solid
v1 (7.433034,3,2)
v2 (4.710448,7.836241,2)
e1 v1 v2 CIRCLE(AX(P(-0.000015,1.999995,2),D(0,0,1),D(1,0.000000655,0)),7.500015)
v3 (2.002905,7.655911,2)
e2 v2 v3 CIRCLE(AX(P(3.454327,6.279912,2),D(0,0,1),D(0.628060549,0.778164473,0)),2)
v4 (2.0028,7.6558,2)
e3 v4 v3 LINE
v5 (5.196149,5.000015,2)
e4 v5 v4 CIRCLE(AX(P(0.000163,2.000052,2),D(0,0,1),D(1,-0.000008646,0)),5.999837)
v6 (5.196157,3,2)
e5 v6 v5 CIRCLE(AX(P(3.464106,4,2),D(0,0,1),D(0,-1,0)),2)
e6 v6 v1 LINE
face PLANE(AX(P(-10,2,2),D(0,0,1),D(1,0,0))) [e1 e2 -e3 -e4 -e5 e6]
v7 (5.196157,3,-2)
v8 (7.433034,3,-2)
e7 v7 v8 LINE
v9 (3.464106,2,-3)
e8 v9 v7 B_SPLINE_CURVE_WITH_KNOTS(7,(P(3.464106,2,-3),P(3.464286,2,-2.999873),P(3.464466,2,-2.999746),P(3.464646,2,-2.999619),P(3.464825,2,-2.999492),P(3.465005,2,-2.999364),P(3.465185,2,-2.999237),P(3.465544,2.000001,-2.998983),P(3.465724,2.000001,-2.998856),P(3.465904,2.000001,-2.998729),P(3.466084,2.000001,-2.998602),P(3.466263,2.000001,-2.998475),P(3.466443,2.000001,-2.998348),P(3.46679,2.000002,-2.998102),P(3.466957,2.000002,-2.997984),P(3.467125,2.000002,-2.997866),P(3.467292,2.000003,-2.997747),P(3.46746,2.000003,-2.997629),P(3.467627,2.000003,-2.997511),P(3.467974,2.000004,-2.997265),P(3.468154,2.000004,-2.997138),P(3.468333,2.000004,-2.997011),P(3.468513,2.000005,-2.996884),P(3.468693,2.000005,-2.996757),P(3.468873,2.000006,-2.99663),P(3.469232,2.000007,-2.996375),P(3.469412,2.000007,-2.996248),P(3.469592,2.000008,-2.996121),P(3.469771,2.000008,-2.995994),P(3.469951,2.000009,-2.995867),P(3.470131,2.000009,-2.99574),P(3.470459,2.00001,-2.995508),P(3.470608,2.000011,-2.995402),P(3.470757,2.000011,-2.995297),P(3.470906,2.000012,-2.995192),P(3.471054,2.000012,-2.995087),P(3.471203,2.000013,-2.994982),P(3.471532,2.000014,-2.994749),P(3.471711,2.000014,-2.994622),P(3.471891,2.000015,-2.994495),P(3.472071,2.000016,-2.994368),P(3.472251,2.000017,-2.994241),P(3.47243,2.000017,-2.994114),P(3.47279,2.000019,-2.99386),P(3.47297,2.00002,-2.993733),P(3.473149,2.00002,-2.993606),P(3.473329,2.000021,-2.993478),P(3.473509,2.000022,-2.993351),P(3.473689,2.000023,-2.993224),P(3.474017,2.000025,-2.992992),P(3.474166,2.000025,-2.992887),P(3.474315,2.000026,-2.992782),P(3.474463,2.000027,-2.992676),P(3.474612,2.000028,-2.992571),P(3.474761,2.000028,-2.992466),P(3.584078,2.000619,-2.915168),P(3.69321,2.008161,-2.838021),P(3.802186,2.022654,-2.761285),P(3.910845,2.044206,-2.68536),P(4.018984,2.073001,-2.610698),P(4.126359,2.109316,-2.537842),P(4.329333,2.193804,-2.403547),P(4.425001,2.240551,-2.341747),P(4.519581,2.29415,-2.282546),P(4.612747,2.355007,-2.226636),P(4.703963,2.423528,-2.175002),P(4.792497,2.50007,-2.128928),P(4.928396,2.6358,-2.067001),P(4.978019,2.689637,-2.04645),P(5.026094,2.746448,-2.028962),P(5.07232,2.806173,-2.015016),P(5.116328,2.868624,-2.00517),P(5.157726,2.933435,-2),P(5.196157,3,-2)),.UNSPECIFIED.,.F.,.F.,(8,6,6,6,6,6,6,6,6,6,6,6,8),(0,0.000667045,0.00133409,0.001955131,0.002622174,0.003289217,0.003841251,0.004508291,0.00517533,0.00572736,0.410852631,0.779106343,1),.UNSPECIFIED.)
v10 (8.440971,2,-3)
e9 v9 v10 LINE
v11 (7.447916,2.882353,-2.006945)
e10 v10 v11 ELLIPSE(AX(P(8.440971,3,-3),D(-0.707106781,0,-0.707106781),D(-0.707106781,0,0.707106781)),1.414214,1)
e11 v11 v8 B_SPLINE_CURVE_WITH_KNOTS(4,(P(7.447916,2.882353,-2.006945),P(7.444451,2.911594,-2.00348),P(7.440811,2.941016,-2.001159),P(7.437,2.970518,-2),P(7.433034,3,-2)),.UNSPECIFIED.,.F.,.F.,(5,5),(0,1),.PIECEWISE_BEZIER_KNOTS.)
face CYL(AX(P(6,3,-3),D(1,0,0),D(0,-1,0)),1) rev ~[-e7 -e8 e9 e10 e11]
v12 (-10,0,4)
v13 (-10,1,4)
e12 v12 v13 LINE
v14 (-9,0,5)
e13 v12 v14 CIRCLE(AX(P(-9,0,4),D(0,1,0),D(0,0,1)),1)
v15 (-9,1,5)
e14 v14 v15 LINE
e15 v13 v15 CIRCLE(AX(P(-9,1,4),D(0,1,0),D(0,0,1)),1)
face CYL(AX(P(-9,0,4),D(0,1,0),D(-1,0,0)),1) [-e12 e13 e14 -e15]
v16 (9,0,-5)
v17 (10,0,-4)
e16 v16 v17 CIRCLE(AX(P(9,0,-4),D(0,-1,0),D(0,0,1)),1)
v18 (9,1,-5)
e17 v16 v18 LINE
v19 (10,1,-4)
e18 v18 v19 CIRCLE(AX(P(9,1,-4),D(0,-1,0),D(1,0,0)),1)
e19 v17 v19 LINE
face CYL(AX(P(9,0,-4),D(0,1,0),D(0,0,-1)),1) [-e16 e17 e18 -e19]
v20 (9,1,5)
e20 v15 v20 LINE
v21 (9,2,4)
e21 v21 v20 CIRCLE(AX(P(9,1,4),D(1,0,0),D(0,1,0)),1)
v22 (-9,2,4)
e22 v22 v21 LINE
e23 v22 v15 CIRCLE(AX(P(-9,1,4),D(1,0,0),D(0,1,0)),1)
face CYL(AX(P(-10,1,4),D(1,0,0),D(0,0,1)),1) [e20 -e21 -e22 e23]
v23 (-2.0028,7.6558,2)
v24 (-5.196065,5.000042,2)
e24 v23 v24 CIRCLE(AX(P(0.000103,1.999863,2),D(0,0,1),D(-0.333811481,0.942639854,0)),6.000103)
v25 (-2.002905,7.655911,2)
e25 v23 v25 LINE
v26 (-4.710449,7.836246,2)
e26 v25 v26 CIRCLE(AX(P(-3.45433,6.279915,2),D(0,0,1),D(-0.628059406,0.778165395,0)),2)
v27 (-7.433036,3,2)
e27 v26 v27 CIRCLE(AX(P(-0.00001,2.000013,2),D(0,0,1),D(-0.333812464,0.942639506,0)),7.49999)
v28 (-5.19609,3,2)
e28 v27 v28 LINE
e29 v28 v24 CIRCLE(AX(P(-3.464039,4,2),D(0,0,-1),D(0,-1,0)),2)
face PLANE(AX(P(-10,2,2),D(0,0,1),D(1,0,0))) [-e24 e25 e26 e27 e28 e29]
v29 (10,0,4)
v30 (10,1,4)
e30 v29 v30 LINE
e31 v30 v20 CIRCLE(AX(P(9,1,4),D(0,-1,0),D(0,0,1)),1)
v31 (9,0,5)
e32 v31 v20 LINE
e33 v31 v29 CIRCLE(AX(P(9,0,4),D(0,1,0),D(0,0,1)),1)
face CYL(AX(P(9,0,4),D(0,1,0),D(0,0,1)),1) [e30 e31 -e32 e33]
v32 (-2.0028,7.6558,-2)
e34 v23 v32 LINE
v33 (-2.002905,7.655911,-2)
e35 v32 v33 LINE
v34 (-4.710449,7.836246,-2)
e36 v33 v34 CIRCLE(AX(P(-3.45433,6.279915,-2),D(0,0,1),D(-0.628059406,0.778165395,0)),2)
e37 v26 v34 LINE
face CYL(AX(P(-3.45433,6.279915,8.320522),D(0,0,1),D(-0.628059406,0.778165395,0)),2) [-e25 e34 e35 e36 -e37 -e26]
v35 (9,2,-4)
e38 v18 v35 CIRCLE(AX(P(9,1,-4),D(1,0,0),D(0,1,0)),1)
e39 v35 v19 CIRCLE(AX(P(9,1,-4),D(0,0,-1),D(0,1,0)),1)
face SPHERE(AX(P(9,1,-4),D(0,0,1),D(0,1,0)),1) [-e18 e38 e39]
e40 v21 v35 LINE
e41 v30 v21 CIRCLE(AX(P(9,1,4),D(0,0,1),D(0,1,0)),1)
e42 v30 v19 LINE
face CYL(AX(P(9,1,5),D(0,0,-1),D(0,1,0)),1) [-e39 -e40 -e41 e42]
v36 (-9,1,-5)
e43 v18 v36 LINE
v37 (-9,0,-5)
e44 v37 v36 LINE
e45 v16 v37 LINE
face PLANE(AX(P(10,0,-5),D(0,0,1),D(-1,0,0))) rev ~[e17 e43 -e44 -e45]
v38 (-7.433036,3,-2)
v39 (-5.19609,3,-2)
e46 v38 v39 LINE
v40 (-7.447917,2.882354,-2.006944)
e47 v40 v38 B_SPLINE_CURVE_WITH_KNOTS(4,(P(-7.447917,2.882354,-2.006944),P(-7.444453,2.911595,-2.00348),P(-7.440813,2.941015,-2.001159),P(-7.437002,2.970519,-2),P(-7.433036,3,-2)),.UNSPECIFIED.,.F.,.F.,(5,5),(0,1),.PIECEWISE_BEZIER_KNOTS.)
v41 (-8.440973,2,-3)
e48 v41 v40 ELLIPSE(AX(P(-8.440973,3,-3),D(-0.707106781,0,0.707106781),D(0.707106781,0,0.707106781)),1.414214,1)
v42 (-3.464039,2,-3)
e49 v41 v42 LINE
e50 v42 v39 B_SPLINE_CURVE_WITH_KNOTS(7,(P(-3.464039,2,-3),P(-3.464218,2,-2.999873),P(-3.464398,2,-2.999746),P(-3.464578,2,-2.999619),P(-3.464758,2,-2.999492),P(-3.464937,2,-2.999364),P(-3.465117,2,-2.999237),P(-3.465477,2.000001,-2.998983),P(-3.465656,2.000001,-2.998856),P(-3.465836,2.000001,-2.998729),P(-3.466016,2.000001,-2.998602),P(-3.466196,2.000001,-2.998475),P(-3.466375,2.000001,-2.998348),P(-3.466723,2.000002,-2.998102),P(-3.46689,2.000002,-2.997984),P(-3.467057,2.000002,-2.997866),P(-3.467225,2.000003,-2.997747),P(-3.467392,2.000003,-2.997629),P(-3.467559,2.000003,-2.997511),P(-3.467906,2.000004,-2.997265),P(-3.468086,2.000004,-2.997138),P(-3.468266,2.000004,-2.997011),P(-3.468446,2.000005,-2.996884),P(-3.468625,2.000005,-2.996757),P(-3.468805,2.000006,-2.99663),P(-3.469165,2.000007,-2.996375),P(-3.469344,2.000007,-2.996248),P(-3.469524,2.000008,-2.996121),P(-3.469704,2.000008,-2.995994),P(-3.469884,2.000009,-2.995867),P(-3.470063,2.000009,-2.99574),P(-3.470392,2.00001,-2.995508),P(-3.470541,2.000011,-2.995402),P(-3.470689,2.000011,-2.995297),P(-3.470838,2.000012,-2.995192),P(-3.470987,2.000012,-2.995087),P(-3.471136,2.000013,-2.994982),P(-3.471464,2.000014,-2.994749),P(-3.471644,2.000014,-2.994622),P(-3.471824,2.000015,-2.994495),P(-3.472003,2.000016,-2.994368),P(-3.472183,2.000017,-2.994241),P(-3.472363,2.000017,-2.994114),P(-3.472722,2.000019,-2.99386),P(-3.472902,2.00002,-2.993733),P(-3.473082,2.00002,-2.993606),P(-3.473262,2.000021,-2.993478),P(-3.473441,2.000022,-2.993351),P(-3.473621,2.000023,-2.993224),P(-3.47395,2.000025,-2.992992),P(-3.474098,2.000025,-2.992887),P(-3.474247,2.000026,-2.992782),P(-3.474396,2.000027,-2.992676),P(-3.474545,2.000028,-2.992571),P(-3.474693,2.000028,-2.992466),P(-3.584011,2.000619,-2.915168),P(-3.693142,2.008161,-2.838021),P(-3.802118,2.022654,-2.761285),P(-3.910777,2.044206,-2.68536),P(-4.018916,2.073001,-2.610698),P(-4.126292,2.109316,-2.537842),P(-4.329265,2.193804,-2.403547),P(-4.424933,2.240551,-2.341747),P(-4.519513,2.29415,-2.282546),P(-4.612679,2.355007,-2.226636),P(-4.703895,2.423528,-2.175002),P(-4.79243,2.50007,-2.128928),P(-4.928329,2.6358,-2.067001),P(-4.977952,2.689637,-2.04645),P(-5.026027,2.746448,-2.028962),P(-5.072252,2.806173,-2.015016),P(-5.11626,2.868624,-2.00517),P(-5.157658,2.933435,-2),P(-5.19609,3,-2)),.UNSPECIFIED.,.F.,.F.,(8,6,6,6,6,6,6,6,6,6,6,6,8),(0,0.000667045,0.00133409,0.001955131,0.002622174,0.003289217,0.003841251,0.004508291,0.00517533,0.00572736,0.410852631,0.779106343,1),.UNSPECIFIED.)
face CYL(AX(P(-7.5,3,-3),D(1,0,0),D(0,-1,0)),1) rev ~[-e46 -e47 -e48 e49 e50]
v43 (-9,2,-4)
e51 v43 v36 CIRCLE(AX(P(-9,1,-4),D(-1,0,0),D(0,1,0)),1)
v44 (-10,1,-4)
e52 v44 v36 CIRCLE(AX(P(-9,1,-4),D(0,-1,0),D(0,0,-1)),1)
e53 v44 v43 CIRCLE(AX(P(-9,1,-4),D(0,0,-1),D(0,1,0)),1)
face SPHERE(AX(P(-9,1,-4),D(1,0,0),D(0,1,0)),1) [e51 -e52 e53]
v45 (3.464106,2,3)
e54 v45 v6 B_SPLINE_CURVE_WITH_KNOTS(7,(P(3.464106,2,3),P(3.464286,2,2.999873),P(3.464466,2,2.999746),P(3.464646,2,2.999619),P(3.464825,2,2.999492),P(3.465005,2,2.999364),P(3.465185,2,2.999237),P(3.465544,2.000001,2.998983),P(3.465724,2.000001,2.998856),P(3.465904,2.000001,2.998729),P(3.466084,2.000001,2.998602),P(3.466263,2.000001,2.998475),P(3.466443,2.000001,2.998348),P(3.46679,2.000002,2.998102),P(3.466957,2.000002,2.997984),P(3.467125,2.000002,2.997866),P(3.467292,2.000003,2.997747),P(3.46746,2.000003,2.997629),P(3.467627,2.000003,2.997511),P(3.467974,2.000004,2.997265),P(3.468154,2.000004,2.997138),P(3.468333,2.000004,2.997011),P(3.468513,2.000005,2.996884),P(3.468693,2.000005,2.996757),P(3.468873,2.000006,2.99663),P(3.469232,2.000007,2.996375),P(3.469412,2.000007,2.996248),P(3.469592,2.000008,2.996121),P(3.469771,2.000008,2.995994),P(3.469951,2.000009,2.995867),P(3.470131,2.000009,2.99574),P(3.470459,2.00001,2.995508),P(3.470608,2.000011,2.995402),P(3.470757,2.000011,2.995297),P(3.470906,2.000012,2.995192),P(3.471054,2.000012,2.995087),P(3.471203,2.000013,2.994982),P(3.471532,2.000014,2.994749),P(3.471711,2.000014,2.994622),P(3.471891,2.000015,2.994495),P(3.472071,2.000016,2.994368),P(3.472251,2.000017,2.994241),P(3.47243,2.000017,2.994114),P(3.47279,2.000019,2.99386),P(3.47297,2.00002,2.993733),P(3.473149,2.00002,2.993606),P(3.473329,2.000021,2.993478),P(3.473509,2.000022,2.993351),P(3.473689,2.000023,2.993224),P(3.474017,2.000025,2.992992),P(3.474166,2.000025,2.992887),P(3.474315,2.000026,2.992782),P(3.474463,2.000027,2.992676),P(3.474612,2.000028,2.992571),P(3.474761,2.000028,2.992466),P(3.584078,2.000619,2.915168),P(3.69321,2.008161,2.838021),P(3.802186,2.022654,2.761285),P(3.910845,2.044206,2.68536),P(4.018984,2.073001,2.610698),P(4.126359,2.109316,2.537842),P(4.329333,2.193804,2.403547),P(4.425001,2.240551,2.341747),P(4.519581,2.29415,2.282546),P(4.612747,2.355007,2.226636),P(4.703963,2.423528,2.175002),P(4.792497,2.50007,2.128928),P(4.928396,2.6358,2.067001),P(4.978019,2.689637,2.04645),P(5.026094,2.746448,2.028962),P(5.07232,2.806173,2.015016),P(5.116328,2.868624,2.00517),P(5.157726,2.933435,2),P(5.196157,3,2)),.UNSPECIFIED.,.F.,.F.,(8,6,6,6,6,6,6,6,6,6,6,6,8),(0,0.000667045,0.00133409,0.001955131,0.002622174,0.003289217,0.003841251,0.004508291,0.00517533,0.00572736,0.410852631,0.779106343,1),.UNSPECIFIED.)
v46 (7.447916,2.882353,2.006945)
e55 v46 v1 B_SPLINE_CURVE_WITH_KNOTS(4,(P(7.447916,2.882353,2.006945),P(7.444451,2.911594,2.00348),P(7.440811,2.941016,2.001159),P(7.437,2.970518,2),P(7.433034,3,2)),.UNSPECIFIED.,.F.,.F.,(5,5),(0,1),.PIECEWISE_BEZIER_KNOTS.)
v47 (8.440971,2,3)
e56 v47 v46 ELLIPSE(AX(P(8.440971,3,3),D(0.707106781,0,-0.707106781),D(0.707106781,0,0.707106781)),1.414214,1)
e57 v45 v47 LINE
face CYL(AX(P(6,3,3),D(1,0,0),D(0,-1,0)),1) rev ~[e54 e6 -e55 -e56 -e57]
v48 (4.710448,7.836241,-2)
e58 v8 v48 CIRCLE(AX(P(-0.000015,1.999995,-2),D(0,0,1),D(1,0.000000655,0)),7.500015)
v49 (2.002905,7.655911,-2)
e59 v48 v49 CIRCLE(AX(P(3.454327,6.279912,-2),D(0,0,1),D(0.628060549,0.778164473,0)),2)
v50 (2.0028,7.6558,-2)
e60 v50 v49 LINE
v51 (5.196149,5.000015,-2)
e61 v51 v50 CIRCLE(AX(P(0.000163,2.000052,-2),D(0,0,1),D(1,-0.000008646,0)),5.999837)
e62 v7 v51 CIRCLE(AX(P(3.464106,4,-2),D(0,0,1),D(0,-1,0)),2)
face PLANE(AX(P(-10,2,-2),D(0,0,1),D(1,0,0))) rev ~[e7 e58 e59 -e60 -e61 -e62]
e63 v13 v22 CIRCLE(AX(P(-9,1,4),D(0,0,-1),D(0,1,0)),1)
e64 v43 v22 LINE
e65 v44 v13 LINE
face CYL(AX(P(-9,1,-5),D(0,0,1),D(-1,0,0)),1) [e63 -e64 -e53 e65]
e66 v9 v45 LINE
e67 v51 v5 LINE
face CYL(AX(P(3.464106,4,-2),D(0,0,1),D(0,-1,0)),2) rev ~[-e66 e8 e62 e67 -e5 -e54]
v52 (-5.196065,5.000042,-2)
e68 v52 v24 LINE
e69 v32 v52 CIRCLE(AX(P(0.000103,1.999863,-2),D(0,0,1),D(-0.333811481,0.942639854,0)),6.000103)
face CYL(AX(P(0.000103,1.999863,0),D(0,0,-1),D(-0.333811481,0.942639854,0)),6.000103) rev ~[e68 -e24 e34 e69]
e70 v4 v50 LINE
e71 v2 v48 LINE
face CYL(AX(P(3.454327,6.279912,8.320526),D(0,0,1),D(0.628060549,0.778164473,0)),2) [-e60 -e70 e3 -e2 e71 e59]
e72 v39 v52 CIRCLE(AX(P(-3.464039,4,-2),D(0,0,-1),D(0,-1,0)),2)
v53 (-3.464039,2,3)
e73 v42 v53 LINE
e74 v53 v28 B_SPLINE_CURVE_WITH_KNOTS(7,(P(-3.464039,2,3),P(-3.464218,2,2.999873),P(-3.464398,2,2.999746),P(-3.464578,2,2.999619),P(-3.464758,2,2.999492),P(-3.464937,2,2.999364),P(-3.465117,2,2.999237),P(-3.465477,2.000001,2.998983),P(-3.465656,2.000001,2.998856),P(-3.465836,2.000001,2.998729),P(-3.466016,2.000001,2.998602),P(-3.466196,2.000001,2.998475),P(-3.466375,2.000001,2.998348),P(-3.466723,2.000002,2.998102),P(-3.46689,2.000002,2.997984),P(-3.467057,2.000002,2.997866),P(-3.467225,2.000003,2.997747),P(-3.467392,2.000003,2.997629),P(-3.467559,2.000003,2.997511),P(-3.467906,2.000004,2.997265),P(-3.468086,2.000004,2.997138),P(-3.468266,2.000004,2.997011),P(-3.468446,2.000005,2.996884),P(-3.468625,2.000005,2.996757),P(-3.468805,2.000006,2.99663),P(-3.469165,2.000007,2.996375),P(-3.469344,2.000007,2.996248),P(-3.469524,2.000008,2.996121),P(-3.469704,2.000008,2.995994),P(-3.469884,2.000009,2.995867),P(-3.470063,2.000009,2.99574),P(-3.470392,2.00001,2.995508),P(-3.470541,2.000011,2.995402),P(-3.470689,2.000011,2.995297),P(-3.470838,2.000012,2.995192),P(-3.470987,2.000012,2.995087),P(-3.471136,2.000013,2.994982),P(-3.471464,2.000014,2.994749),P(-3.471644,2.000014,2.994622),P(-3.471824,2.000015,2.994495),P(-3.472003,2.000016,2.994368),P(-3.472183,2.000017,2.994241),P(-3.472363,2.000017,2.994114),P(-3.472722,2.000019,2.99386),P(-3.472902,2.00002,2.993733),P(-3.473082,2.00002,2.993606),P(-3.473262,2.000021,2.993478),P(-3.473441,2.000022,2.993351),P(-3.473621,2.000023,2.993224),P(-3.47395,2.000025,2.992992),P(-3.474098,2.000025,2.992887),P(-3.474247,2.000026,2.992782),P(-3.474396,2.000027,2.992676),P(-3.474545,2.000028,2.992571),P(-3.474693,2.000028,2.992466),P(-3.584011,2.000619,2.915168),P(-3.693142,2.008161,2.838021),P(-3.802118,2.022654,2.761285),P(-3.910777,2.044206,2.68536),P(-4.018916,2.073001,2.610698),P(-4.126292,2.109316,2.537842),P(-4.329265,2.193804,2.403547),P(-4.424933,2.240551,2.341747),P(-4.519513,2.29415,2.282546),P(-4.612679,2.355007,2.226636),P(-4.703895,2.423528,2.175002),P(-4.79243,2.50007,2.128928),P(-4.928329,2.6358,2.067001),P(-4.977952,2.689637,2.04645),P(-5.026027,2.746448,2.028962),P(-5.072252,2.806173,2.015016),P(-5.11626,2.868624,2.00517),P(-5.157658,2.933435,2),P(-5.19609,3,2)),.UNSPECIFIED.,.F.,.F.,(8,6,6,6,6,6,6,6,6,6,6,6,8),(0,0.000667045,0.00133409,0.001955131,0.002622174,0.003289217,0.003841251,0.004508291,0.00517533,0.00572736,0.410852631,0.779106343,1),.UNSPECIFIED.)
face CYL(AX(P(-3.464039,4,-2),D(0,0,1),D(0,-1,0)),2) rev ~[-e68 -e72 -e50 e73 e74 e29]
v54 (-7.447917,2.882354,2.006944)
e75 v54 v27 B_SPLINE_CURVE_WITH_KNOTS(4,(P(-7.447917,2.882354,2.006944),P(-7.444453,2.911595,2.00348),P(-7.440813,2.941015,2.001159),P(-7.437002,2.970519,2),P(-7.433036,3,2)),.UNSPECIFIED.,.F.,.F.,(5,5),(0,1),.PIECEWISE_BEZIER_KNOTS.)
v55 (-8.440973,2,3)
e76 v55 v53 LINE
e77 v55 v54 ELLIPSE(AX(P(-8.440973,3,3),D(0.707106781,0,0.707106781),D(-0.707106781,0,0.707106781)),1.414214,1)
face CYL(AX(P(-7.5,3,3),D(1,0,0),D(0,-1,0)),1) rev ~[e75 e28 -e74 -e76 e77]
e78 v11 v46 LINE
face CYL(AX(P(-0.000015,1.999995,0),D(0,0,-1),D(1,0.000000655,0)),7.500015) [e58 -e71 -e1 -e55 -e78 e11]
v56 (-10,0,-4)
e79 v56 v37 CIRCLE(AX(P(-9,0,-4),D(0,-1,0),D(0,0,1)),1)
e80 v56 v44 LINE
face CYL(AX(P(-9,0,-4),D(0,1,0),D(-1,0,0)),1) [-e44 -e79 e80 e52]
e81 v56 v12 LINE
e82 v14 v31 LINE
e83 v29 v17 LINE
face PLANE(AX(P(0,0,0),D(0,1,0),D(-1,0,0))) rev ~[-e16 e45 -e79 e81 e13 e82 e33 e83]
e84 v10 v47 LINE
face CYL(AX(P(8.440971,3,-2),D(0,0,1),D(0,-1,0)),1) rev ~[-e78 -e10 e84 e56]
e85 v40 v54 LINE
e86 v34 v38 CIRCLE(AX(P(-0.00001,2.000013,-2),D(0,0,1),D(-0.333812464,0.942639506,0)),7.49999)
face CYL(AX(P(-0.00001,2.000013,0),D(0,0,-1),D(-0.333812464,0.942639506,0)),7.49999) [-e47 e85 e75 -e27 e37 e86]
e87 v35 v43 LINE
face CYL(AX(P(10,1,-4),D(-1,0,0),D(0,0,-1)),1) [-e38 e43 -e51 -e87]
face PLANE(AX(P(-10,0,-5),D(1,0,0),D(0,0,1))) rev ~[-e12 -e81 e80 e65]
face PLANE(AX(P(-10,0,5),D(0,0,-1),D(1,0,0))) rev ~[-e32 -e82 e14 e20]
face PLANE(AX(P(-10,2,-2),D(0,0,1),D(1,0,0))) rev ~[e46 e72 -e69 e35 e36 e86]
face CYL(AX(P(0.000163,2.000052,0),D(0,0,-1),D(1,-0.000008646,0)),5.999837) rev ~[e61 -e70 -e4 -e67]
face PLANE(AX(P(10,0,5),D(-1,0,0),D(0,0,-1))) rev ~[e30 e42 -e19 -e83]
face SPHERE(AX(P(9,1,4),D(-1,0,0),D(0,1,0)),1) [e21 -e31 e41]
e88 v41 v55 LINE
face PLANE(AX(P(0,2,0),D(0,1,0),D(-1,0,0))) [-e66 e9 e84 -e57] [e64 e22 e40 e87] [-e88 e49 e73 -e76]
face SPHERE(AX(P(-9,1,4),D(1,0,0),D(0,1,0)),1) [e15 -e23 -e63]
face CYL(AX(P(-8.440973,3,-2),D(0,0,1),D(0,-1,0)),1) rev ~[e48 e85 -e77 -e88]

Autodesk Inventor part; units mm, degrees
ref_plane "YZ Plane" through (0, 0, 0) normal (1, 0, 0) x (0, 1, 0)
ref_plane "XZ Plane" through (0, 0, 0) normal (0, 1, 0) x (-1, 0, 0)
ref_plane "XY Plane" through (0, 0, 0) normal (0, 0, 1) x (1, 0, 0)
sketch "Sketch1" plane through (0, 0, 0) normal (0, 1, 0) x (-1, 0, 0)
  line L0 (10, 5) -> (-10, 5)
  line L1 (-10, 5) -> (-10, -5)
  line L2 (-10, -5) -> (10, -5)
  line L3 (10, -5) -> (10, 5)
  line L4 (10, 5) -> (-10, -5) construction
  line L5 (-10, 5) -> (10, -5) construction
  point P0 (0, 0)
  dimension "d0" = 20
  dimension "d1" = 10
extrude "Extrusion1" add sketch "Sketch1" along normal blind 2
sketch "Sketch2" plane through (0, 2, 0) normal (0, 1, 0) x (1, 0, 0)
  line L0 (-10, -5) -> (10, -5) construction
  line L1 (10, -5) -> (10, 5) construction
  line L2 (10, 5) -> (-10, 5) construction
  line L3 (-10, 5) -> (-10, -5) construction
  line L4 (-10, 5) -> (-10, -5) construction
  line L5 (-10, 0) -> (10, 0) construction
  point P0 (0, 0)
ref_plane "Work Plane1" through (-10, 2, 0) normal (0, 0, 1) x (1, 0, 0)
sketch "Sketch3" plane through (-10, 2, 0) normal (0, 0, 1) x (1, 0, 0)
  line L0 (0, 0) -> (20, 0) construction
  line L1 (2.5, 0) -> (4, 0)
  line L2 (0, 0) -> (20, 0) projected
  line L3 (16, 0) -> (17.5, 0)
  arc A0 (16, 0) -> (12.0028, 5.6558) centre (10, 0) ccw
  arc A1 (7.9972, 5.6558) -> (4, 0) centre (10, 0) ccw
  arc A2 (17.5, 0) -> (12.5036, 7.0698) centre (10, 0) ccw
  arc A3 (7.4964, 7.0698) -> (2.5, 0) centre (10, 0) ccw
  line L4 (10, 0) -> (10, 7.5) construction
  line L5 (10, 0) -> (12.5036, 7.0698)
  line L6 (10, 0) -> (10, 7.5) construction
  line L7 (10, 0) -> (10, 7.5) construction
  line L8 (10, 0) -> (7.4964, 7.0698)
  line L9 (10, 0) -> (10, 7.5) construction
  point P0 (10, -2)
  point P1 (7.1395, 6.9331)
  point P2 (12.8605, 6.9331)
  point P3 (7.7742, 5.5719)
  point P4 (12.2258, 5.5719)
  point P5 (6.1541, 6.4389)
  point P6 (13.8459, 6.4389)
  dimension "d14" = 19.5
  dimension "d16" = 19.5
extrude "Extrusion2" add sketch "Sketch3" along normal blind 2 and the other way blind 2 contours A3 L8 A1 L1 | A0 L5 A2 L2
fillet "Fillet1" radius 2 2 edges at (-2.5036, 9.0698, 0) (2.5036, 9.0698, 0)
fillet "Fillet2" radius 1 8 edges at (0, 2, 5) (10, 2, 0) (0, 2, -5) (-10, 2, 0) (10, 1, -5) (-10, 1, -5) (-10, 1, 5) (10, 1, 5)
fillet "Fillet4" radius 2 2 edges at (-6, 2, 0) (6, 2, 0)
fillet "Fillet4" radius 1 6 edges at (6.75, 2, 2) (7.5, 2, 0) (6.75, 2, -2) (-6.75, 2, 2) (-7.5, 2, 0) (-6.75, 2, -2)
properties part number "cable_holder"
